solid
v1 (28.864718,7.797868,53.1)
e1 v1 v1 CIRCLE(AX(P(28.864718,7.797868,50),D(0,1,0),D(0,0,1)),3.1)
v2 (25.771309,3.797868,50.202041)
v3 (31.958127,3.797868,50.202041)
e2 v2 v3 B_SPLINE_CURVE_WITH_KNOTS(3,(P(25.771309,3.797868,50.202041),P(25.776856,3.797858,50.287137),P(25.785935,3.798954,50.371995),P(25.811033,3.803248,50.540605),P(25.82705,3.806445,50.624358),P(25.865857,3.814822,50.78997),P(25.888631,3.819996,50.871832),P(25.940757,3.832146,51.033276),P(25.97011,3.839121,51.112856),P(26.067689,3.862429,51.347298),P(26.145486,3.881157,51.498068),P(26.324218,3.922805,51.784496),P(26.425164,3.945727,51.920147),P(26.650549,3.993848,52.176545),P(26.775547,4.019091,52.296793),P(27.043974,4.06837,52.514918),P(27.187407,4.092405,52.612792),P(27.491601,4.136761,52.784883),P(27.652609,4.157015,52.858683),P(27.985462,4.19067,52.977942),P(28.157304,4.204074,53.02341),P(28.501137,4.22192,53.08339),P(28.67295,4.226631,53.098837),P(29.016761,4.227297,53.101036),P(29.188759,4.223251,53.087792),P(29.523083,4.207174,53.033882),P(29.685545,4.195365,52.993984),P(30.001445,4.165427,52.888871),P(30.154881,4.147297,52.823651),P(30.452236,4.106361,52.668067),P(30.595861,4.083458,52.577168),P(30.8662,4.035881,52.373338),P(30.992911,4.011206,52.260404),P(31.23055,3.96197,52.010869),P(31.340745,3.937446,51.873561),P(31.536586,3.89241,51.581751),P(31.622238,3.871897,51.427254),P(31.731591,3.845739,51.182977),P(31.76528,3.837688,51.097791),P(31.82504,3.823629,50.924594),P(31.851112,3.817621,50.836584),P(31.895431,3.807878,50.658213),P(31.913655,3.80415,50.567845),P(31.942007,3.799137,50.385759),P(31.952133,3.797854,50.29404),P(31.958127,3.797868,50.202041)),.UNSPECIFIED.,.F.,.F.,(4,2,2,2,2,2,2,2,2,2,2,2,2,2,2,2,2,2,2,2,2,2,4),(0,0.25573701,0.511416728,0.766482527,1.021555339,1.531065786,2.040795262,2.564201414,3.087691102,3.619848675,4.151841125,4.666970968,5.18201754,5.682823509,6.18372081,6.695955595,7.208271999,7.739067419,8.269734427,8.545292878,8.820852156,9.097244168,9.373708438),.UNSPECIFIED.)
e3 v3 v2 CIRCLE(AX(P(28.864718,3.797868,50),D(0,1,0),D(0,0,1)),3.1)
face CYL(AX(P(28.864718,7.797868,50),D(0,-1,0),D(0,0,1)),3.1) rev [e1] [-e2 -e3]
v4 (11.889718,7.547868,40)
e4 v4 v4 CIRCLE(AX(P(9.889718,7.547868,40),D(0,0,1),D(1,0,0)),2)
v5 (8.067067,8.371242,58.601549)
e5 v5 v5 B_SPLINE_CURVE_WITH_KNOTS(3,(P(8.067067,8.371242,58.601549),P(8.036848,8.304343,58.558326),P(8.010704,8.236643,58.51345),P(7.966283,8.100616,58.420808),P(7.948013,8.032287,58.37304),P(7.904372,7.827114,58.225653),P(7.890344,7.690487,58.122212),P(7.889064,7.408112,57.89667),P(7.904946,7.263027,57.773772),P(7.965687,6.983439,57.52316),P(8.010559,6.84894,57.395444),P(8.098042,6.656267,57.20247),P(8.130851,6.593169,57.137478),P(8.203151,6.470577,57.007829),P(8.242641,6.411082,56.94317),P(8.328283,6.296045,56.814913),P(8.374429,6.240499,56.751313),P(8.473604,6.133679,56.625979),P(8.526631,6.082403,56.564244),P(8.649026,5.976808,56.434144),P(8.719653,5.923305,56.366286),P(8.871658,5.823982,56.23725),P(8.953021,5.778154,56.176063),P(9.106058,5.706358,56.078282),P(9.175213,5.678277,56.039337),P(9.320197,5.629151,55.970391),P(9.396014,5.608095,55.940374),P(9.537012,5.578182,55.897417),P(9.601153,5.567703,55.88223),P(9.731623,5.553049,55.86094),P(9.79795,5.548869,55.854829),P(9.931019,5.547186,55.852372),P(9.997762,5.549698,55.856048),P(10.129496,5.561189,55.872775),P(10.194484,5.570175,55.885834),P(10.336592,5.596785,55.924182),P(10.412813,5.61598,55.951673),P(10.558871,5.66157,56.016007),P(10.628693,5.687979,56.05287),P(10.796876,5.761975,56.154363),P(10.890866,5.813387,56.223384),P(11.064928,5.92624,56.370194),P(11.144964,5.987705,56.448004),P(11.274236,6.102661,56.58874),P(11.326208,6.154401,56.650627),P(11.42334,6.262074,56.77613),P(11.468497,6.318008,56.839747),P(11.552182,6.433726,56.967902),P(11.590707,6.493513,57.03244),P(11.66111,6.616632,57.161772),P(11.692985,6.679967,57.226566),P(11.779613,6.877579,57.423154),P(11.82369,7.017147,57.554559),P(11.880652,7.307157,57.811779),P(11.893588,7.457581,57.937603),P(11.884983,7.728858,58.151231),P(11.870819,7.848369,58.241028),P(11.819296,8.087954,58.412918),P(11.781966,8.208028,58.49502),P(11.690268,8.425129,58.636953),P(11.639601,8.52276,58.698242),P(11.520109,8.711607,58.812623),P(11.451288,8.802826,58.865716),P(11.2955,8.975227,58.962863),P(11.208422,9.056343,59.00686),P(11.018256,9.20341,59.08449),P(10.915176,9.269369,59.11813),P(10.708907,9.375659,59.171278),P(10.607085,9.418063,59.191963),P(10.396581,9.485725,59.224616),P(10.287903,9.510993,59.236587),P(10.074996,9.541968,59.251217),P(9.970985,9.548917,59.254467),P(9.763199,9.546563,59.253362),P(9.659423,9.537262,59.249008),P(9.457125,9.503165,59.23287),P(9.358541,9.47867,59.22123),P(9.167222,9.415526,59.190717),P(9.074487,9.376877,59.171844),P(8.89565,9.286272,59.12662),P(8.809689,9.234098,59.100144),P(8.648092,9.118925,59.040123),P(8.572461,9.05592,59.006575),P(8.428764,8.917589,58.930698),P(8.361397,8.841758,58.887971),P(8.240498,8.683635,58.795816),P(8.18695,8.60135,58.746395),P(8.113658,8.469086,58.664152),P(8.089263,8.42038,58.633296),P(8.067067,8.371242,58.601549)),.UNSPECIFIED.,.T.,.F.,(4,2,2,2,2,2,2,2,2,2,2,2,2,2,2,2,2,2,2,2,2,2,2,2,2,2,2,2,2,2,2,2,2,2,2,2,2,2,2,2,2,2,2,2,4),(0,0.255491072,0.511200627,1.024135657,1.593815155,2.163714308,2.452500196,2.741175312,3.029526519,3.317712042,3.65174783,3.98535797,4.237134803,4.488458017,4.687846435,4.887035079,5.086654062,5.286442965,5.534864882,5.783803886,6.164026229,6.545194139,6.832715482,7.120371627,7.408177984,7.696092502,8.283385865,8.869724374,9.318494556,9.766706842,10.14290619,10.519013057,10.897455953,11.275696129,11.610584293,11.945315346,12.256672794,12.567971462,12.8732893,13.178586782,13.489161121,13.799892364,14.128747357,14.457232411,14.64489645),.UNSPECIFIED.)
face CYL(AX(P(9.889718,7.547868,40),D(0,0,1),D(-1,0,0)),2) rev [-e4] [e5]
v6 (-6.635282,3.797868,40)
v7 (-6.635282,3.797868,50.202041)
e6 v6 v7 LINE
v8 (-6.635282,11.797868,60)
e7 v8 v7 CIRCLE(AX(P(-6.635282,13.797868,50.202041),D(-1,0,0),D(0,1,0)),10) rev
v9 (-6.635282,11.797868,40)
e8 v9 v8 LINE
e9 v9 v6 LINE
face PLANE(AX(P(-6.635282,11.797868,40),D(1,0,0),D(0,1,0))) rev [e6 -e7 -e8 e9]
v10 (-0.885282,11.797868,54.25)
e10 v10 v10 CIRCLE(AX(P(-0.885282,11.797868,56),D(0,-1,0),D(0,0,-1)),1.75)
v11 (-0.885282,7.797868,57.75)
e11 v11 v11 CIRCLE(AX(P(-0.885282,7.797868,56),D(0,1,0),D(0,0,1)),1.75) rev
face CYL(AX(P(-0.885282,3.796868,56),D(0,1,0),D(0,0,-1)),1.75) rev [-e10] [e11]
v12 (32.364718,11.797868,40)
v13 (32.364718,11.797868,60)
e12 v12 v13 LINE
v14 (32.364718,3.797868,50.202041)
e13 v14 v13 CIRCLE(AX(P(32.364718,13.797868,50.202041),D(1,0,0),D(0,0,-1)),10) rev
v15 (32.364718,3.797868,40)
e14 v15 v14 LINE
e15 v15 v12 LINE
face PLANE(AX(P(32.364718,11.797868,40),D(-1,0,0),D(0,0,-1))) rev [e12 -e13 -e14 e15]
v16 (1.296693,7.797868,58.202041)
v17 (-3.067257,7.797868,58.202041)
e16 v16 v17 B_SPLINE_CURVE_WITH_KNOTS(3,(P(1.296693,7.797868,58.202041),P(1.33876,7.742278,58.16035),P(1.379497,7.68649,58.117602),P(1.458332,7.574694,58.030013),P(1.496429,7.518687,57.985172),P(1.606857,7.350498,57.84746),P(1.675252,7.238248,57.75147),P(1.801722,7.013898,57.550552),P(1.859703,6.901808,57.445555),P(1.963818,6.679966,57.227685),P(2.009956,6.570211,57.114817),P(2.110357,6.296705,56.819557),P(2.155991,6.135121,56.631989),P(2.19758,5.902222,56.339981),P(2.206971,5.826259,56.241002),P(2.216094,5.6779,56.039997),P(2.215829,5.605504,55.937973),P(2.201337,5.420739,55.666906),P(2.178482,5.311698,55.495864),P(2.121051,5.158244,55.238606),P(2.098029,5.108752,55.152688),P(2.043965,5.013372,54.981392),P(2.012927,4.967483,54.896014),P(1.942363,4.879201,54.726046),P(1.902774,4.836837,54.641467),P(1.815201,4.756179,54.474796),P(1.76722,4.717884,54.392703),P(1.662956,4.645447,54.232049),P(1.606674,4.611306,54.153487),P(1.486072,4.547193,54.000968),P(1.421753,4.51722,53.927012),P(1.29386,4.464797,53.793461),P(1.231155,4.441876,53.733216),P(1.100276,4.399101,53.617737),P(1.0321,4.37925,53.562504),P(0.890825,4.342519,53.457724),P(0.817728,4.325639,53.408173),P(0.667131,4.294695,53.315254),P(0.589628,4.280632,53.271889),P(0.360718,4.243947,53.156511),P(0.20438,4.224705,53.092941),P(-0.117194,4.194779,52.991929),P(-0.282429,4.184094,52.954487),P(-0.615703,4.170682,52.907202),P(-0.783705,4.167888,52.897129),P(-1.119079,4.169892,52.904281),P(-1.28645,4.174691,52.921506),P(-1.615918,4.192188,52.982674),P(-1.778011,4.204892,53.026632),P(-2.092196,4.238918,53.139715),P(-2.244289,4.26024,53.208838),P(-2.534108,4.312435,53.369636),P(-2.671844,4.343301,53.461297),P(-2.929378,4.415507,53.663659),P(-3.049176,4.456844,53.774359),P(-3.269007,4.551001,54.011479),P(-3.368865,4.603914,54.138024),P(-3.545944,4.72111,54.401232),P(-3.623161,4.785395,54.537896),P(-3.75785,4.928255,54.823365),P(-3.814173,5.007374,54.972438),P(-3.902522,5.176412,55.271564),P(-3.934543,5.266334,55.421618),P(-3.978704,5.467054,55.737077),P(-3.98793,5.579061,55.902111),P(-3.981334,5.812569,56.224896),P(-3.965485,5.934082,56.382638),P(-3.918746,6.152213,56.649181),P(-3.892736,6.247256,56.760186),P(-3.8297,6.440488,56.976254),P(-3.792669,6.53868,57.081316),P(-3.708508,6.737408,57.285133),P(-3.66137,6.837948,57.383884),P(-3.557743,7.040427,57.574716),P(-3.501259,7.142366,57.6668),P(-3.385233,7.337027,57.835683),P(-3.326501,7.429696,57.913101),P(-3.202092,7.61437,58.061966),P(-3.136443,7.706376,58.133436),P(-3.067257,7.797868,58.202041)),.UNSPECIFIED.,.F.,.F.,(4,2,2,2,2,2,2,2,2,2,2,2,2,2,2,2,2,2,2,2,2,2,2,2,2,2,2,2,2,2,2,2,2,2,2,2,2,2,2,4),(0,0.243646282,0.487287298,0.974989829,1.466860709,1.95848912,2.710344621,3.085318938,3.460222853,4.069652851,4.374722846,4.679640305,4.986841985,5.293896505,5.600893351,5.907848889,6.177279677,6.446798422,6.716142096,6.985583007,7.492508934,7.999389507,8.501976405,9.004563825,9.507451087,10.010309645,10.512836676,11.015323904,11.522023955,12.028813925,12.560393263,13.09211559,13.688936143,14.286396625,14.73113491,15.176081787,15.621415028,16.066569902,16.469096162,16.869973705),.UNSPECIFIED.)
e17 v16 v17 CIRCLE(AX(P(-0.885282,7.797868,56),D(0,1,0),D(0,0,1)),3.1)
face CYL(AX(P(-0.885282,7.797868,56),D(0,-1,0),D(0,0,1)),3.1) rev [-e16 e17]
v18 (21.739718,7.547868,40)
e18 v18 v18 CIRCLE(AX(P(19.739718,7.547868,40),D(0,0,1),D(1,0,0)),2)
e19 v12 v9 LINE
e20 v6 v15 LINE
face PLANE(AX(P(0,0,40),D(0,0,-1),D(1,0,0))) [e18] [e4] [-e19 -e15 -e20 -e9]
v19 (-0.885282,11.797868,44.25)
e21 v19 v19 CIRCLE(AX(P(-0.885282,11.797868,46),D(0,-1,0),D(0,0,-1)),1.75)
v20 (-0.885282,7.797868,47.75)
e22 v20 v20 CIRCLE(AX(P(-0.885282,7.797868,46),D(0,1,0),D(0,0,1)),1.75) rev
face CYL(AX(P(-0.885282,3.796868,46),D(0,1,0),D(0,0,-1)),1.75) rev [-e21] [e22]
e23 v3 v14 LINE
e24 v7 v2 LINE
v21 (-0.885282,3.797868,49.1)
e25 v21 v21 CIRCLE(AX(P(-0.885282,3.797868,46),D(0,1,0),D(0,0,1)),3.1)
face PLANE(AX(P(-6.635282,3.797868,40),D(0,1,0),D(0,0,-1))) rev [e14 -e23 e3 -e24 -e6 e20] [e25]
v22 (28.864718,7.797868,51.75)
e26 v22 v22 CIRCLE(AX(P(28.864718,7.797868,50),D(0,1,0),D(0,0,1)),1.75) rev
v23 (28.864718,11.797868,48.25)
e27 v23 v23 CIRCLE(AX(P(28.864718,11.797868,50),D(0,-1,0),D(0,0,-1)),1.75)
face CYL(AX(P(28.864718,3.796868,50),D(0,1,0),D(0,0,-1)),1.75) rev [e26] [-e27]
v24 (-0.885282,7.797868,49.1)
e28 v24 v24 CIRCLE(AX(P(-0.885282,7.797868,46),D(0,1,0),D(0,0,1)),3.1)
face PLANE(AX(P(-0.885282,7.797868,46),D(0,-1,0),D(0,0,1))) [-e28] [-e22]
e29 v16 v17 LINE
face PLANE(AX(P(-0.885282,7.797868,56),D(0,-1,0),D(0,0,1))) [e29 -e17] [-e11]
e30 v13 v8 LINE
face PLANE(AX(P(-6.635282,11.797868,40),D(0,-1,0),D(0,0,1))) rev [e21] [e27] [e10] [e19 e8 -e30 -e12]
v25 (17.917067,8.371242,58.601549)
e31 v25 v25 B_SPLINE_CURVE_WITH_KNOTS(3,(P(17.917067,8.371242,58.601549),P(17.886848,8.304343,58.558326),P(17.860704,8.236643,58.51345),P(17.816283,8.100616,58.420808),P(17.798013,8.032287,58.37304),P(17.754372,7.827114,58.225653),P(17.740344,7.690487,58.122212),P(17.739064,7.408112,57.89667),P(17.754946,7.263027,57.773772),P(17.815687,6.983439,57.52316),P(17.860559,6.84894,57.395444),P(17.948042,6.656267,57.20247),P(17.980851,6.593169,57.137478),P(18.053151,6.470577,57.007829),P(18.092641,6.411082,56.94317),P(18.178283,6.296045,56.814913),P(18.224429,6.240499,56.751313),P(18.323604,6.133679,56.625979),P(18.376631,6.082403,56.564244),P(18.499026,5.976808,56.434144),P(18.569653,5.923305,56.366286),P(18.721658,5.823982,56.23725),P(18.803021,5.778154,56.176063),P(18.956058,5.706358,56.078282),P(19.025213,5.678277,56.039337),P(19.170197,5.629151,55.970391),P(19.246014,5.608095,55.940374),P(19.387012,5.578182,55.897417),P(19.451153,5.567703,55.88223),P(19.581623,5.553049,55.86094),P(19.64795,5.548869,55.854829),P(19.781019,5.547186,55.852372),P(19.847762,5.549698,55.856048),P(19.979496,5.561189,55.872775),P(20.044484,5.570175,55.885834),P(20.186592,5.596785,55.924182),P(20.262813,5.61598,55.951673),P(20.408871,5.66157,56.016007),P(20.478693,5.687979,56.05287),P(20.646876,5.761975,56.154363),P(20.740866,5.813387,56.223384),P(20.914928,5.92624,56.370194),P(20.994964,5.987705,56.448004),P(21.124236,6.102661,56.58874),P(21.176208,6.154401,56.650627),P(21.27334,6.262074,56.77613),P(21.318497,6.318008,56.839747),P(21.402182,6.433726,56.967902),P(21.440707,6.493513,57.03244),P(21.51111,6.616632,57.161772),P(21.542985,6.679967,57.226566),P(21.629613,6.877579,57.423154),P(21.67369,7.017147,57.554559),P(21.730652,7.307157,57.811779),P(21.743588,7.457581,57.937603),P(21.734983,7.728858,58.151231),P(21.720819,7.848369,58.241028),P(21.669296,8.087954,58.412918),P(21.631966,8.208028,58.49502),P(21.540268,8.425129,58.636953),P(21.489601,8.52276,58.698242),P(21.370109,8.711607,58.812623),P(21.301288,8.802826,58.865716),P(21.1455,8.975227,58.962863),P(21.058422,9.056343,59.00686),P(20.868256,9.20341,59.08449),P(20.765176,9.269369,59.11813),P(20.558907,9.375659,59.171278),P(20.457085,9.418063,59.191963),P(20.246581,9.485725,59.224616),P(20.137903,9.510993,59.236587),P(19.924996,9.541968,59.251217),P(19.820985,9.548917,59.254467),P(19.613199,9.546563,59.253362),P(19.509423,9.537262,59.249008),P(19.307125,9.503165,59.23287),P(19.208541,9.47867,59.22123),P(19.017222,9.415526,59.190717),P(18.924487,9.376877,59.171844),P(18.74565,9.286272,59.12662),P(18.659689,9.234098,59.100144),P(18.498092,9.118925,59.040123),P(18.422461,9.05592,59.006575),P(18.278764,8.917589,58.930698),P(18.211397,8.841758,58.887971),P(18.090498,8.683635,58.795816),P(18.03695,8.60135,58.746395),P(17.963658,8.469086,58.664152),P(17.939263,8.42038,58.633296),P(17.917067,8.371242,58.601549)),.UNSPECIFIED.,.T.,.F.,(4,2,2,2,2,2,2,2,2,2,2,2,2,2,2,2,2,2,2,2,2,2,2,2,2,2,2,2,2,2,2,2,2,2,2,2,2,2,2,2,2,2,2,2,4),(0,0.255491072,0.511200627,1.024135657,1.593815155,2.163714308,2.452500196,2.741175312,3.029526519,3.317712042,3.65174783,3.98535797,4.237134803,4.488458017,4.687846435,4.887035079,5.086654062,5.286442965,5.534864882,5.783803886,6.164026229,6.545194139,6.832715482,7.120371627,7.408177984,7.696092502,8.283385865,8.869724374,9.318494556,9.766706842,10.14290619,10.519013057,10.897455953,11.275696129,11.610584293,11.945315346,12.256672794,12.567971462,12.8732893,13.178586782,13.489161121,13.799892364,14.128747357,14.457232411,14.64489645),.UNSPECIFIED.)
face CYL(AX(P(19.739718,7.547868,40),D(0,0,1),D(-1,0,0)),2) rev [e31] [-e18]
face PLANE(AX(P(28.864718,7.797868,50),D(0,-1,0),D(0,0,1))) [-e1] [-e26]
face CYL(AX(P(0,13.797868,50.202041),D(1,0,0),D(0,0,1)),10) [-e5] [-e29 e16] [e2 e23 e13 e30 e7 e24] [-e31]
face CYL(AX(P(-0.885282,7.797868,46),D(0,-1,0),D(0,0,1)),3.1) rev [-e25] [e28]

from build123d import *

# Parameters (mm, degrees)
SKETCH1_W               = 39
SKETCH1_H               = 8
SKETCH1_R               = 2
BOSS_EXTRUDE1_DEPTH     = 20
CUT_EXTRUDE3_REACH      = 40.878
SKETCH2_R               = 1.75
FILLET1_R               = 10
SKETCH3_R               = 3.1
CUT_EXTRUDE4_DEPTH      = 4
CUT_EXTRUDE6_DEPTH      = 69.640184916
CUT_EXTRUDE6_DEPTH_BACK = 69.640184916
SKETCH4_W               = 49.515831406
SKETCH4_H               = 28.781468371


with BuildPart() as part:
    # Sketch1 → Boss-Extrude1 (new body)
    with BuildSketch(Plane.XY):
        with Locations((12.864717907, 7.797867952)):
            Rectangle(SKETCH1_W, SKETCH1_H)
        with Locations((9.889717907, 7.547867952)):
            Circle(SKETCH1_R, mode=Mode.SUBTRACT)
        with Locations((19.739717907, 7.547867952)):
            Circle(SKETCH1_R, mode=Mode.SUBTRACT)
    extrude(amount=BOSS_EXTRUDE1_DEPTH)

    # Sketch2 → Cut-Extrude3 (cut, up to next)
    with BuildSketch(Plane(origin=(0, 11.797867952, 0), x_dir=(1, 0, 0), z_dir=(0, 1, 0)), mode=Mode.PRIVATE) as cut_extrude3_sk1:
        with Locations(Location((28.864717907, -10, 0), (0, 0, 270))):
            Circle(SKETCH2_R)
    cut_extrude3_tool1 = extrude(cut_extrude3_sk1.sketch, amount=-CUT_EXTRUDE3_REACH, mode=Mode.PRIVATE) & part.part
    # Sketch2 → Cut-Extrude3 (cut, up to next)
    with BuildSketch(Plane(origin=(0, 11.797867952, 0), x_dir=(1, 0, 0), z_dir=(0, 1, 0)), mode=Mode.PRIVATE) as cut_extrude3_sk2:
        with Locations(Location((-0.885282093, -14, 0), (0, 0, 270))):
            Circle(SKETCH2_R)
    cut_extrude3_tool2 = extrude(cut_extrude3_sk2.sketch, amount=-CUT_EXTRUDE3_REACH, mode=Mode.PRIVATE) & part.part
    # Sketch2 → Cut-Extrude3 (cut, up to next)
    with BuildSketch(Plane(origin=(0, 11.797867952, 0), x_dir=(1, 0, 0), z_dir=(0, 1, 0)), mode=Mode.PRIVATE) as cut_extrude3_sk3:
        with Locations(Location((-0.885282093, -4, 0), (0, 0, 270))):
            Circle(SKETCH2_R)
    cut_extrude3_tool3 = extrude(cut_extrude3_sk3.sketch, amount=-CUT_EXTRUDE3_REACH, mode=Mode.PRIVATE) & part.part
    add(cut_extrude3_tool1.solids().sort_by_distance((28.864718, 11.797868, 10))[0], mode=Mode.SUBTRACT)
    add(cut_extrude3_tool2.solids().sort_by_distance((-0.885282, 11.797868, 14))[0], mode=Mode.SUBTRACT)
    add(cut_extrude3_tool3.solids().sort_by_distance((-0.885282, 11.797868, 4))[0], mode=Mode.SUBTRACT)

    # Fillet1
    # the kernel refuses this fillet: 10 mm, written as the material it takes off along each edge
    with BuildSketch(Plane(origin=(56.859615335, 3.797867952, 0), x_dir=(0, 1, 0), z_dir=(-1, 0, 0))) as fillet1_piece_1:
        with BuildLine():
            CenterArc((10, -9.797958971), FILLET1_R, 101.536959033, 78.463040967)
            Line((0, -9.797958971), (-0.2, -9.797958971))
            Line((-0.2, -9.797958971), (-0.2, 0))
            Line((-0.2, 0), (0, 0.2))
            ThreePointArc((0, 0.2), (4, 0.2), (7.96, 0.195959179))
            Line((7.96, 0.195959179), (8, 0))
        make_face()
    extrude(amount=87.989794856, mode=Mode.SUBTRACT)

    # Sketch3 → Cut-Extrude4 (cut)
    with BuildSketch(Plane.XZ.offset(-3.797867952)):
        with Locations(Location((-0.885282093, 14, 0), (0, 0, 270))):
            Circle(SKETCH3_R)
        with Locations(Location((28.864717907, 10, 0), (0, 0, 270))):
            Circle(SKETCH3_R)
        with Locations((-0.885282093, 4)):
            Circle(SKETCH3_R)
    extrude(amount=-CUT_EXTRUDE4_DEPTH, mode=Mode.SUBTRACT)


with BuildPart() as body_2:
    # Mirror1: mirrored copy
    add(part.part.mirror(Plane.XY.offset(30)))


with BuildPart() as part_1:
    add(part.part)

    # Sketch4 → Cut-Extrude6 (cut, two sides: drawn at the far end of the back side and taken through both)
    with BuildSketch(Plane(origin=(0, 11.797867952, 0), x_dir=(1, 0, 0), z_dir=(0, 1, 0)).offset(-CUT_EXTRUDE6_DEPTH_BACK)):
        with Locations((14.166283804, -9.086507762)):
            Rectangle(SKETCH4_W, SKETCH4_H)
    extrude(amount=CUT_EXTRUDE6_DEPTH + CUT_EXTRUDE6_DEPTH_BACK, mode=Mode.SUBTRACT)


solid = body_2.part
